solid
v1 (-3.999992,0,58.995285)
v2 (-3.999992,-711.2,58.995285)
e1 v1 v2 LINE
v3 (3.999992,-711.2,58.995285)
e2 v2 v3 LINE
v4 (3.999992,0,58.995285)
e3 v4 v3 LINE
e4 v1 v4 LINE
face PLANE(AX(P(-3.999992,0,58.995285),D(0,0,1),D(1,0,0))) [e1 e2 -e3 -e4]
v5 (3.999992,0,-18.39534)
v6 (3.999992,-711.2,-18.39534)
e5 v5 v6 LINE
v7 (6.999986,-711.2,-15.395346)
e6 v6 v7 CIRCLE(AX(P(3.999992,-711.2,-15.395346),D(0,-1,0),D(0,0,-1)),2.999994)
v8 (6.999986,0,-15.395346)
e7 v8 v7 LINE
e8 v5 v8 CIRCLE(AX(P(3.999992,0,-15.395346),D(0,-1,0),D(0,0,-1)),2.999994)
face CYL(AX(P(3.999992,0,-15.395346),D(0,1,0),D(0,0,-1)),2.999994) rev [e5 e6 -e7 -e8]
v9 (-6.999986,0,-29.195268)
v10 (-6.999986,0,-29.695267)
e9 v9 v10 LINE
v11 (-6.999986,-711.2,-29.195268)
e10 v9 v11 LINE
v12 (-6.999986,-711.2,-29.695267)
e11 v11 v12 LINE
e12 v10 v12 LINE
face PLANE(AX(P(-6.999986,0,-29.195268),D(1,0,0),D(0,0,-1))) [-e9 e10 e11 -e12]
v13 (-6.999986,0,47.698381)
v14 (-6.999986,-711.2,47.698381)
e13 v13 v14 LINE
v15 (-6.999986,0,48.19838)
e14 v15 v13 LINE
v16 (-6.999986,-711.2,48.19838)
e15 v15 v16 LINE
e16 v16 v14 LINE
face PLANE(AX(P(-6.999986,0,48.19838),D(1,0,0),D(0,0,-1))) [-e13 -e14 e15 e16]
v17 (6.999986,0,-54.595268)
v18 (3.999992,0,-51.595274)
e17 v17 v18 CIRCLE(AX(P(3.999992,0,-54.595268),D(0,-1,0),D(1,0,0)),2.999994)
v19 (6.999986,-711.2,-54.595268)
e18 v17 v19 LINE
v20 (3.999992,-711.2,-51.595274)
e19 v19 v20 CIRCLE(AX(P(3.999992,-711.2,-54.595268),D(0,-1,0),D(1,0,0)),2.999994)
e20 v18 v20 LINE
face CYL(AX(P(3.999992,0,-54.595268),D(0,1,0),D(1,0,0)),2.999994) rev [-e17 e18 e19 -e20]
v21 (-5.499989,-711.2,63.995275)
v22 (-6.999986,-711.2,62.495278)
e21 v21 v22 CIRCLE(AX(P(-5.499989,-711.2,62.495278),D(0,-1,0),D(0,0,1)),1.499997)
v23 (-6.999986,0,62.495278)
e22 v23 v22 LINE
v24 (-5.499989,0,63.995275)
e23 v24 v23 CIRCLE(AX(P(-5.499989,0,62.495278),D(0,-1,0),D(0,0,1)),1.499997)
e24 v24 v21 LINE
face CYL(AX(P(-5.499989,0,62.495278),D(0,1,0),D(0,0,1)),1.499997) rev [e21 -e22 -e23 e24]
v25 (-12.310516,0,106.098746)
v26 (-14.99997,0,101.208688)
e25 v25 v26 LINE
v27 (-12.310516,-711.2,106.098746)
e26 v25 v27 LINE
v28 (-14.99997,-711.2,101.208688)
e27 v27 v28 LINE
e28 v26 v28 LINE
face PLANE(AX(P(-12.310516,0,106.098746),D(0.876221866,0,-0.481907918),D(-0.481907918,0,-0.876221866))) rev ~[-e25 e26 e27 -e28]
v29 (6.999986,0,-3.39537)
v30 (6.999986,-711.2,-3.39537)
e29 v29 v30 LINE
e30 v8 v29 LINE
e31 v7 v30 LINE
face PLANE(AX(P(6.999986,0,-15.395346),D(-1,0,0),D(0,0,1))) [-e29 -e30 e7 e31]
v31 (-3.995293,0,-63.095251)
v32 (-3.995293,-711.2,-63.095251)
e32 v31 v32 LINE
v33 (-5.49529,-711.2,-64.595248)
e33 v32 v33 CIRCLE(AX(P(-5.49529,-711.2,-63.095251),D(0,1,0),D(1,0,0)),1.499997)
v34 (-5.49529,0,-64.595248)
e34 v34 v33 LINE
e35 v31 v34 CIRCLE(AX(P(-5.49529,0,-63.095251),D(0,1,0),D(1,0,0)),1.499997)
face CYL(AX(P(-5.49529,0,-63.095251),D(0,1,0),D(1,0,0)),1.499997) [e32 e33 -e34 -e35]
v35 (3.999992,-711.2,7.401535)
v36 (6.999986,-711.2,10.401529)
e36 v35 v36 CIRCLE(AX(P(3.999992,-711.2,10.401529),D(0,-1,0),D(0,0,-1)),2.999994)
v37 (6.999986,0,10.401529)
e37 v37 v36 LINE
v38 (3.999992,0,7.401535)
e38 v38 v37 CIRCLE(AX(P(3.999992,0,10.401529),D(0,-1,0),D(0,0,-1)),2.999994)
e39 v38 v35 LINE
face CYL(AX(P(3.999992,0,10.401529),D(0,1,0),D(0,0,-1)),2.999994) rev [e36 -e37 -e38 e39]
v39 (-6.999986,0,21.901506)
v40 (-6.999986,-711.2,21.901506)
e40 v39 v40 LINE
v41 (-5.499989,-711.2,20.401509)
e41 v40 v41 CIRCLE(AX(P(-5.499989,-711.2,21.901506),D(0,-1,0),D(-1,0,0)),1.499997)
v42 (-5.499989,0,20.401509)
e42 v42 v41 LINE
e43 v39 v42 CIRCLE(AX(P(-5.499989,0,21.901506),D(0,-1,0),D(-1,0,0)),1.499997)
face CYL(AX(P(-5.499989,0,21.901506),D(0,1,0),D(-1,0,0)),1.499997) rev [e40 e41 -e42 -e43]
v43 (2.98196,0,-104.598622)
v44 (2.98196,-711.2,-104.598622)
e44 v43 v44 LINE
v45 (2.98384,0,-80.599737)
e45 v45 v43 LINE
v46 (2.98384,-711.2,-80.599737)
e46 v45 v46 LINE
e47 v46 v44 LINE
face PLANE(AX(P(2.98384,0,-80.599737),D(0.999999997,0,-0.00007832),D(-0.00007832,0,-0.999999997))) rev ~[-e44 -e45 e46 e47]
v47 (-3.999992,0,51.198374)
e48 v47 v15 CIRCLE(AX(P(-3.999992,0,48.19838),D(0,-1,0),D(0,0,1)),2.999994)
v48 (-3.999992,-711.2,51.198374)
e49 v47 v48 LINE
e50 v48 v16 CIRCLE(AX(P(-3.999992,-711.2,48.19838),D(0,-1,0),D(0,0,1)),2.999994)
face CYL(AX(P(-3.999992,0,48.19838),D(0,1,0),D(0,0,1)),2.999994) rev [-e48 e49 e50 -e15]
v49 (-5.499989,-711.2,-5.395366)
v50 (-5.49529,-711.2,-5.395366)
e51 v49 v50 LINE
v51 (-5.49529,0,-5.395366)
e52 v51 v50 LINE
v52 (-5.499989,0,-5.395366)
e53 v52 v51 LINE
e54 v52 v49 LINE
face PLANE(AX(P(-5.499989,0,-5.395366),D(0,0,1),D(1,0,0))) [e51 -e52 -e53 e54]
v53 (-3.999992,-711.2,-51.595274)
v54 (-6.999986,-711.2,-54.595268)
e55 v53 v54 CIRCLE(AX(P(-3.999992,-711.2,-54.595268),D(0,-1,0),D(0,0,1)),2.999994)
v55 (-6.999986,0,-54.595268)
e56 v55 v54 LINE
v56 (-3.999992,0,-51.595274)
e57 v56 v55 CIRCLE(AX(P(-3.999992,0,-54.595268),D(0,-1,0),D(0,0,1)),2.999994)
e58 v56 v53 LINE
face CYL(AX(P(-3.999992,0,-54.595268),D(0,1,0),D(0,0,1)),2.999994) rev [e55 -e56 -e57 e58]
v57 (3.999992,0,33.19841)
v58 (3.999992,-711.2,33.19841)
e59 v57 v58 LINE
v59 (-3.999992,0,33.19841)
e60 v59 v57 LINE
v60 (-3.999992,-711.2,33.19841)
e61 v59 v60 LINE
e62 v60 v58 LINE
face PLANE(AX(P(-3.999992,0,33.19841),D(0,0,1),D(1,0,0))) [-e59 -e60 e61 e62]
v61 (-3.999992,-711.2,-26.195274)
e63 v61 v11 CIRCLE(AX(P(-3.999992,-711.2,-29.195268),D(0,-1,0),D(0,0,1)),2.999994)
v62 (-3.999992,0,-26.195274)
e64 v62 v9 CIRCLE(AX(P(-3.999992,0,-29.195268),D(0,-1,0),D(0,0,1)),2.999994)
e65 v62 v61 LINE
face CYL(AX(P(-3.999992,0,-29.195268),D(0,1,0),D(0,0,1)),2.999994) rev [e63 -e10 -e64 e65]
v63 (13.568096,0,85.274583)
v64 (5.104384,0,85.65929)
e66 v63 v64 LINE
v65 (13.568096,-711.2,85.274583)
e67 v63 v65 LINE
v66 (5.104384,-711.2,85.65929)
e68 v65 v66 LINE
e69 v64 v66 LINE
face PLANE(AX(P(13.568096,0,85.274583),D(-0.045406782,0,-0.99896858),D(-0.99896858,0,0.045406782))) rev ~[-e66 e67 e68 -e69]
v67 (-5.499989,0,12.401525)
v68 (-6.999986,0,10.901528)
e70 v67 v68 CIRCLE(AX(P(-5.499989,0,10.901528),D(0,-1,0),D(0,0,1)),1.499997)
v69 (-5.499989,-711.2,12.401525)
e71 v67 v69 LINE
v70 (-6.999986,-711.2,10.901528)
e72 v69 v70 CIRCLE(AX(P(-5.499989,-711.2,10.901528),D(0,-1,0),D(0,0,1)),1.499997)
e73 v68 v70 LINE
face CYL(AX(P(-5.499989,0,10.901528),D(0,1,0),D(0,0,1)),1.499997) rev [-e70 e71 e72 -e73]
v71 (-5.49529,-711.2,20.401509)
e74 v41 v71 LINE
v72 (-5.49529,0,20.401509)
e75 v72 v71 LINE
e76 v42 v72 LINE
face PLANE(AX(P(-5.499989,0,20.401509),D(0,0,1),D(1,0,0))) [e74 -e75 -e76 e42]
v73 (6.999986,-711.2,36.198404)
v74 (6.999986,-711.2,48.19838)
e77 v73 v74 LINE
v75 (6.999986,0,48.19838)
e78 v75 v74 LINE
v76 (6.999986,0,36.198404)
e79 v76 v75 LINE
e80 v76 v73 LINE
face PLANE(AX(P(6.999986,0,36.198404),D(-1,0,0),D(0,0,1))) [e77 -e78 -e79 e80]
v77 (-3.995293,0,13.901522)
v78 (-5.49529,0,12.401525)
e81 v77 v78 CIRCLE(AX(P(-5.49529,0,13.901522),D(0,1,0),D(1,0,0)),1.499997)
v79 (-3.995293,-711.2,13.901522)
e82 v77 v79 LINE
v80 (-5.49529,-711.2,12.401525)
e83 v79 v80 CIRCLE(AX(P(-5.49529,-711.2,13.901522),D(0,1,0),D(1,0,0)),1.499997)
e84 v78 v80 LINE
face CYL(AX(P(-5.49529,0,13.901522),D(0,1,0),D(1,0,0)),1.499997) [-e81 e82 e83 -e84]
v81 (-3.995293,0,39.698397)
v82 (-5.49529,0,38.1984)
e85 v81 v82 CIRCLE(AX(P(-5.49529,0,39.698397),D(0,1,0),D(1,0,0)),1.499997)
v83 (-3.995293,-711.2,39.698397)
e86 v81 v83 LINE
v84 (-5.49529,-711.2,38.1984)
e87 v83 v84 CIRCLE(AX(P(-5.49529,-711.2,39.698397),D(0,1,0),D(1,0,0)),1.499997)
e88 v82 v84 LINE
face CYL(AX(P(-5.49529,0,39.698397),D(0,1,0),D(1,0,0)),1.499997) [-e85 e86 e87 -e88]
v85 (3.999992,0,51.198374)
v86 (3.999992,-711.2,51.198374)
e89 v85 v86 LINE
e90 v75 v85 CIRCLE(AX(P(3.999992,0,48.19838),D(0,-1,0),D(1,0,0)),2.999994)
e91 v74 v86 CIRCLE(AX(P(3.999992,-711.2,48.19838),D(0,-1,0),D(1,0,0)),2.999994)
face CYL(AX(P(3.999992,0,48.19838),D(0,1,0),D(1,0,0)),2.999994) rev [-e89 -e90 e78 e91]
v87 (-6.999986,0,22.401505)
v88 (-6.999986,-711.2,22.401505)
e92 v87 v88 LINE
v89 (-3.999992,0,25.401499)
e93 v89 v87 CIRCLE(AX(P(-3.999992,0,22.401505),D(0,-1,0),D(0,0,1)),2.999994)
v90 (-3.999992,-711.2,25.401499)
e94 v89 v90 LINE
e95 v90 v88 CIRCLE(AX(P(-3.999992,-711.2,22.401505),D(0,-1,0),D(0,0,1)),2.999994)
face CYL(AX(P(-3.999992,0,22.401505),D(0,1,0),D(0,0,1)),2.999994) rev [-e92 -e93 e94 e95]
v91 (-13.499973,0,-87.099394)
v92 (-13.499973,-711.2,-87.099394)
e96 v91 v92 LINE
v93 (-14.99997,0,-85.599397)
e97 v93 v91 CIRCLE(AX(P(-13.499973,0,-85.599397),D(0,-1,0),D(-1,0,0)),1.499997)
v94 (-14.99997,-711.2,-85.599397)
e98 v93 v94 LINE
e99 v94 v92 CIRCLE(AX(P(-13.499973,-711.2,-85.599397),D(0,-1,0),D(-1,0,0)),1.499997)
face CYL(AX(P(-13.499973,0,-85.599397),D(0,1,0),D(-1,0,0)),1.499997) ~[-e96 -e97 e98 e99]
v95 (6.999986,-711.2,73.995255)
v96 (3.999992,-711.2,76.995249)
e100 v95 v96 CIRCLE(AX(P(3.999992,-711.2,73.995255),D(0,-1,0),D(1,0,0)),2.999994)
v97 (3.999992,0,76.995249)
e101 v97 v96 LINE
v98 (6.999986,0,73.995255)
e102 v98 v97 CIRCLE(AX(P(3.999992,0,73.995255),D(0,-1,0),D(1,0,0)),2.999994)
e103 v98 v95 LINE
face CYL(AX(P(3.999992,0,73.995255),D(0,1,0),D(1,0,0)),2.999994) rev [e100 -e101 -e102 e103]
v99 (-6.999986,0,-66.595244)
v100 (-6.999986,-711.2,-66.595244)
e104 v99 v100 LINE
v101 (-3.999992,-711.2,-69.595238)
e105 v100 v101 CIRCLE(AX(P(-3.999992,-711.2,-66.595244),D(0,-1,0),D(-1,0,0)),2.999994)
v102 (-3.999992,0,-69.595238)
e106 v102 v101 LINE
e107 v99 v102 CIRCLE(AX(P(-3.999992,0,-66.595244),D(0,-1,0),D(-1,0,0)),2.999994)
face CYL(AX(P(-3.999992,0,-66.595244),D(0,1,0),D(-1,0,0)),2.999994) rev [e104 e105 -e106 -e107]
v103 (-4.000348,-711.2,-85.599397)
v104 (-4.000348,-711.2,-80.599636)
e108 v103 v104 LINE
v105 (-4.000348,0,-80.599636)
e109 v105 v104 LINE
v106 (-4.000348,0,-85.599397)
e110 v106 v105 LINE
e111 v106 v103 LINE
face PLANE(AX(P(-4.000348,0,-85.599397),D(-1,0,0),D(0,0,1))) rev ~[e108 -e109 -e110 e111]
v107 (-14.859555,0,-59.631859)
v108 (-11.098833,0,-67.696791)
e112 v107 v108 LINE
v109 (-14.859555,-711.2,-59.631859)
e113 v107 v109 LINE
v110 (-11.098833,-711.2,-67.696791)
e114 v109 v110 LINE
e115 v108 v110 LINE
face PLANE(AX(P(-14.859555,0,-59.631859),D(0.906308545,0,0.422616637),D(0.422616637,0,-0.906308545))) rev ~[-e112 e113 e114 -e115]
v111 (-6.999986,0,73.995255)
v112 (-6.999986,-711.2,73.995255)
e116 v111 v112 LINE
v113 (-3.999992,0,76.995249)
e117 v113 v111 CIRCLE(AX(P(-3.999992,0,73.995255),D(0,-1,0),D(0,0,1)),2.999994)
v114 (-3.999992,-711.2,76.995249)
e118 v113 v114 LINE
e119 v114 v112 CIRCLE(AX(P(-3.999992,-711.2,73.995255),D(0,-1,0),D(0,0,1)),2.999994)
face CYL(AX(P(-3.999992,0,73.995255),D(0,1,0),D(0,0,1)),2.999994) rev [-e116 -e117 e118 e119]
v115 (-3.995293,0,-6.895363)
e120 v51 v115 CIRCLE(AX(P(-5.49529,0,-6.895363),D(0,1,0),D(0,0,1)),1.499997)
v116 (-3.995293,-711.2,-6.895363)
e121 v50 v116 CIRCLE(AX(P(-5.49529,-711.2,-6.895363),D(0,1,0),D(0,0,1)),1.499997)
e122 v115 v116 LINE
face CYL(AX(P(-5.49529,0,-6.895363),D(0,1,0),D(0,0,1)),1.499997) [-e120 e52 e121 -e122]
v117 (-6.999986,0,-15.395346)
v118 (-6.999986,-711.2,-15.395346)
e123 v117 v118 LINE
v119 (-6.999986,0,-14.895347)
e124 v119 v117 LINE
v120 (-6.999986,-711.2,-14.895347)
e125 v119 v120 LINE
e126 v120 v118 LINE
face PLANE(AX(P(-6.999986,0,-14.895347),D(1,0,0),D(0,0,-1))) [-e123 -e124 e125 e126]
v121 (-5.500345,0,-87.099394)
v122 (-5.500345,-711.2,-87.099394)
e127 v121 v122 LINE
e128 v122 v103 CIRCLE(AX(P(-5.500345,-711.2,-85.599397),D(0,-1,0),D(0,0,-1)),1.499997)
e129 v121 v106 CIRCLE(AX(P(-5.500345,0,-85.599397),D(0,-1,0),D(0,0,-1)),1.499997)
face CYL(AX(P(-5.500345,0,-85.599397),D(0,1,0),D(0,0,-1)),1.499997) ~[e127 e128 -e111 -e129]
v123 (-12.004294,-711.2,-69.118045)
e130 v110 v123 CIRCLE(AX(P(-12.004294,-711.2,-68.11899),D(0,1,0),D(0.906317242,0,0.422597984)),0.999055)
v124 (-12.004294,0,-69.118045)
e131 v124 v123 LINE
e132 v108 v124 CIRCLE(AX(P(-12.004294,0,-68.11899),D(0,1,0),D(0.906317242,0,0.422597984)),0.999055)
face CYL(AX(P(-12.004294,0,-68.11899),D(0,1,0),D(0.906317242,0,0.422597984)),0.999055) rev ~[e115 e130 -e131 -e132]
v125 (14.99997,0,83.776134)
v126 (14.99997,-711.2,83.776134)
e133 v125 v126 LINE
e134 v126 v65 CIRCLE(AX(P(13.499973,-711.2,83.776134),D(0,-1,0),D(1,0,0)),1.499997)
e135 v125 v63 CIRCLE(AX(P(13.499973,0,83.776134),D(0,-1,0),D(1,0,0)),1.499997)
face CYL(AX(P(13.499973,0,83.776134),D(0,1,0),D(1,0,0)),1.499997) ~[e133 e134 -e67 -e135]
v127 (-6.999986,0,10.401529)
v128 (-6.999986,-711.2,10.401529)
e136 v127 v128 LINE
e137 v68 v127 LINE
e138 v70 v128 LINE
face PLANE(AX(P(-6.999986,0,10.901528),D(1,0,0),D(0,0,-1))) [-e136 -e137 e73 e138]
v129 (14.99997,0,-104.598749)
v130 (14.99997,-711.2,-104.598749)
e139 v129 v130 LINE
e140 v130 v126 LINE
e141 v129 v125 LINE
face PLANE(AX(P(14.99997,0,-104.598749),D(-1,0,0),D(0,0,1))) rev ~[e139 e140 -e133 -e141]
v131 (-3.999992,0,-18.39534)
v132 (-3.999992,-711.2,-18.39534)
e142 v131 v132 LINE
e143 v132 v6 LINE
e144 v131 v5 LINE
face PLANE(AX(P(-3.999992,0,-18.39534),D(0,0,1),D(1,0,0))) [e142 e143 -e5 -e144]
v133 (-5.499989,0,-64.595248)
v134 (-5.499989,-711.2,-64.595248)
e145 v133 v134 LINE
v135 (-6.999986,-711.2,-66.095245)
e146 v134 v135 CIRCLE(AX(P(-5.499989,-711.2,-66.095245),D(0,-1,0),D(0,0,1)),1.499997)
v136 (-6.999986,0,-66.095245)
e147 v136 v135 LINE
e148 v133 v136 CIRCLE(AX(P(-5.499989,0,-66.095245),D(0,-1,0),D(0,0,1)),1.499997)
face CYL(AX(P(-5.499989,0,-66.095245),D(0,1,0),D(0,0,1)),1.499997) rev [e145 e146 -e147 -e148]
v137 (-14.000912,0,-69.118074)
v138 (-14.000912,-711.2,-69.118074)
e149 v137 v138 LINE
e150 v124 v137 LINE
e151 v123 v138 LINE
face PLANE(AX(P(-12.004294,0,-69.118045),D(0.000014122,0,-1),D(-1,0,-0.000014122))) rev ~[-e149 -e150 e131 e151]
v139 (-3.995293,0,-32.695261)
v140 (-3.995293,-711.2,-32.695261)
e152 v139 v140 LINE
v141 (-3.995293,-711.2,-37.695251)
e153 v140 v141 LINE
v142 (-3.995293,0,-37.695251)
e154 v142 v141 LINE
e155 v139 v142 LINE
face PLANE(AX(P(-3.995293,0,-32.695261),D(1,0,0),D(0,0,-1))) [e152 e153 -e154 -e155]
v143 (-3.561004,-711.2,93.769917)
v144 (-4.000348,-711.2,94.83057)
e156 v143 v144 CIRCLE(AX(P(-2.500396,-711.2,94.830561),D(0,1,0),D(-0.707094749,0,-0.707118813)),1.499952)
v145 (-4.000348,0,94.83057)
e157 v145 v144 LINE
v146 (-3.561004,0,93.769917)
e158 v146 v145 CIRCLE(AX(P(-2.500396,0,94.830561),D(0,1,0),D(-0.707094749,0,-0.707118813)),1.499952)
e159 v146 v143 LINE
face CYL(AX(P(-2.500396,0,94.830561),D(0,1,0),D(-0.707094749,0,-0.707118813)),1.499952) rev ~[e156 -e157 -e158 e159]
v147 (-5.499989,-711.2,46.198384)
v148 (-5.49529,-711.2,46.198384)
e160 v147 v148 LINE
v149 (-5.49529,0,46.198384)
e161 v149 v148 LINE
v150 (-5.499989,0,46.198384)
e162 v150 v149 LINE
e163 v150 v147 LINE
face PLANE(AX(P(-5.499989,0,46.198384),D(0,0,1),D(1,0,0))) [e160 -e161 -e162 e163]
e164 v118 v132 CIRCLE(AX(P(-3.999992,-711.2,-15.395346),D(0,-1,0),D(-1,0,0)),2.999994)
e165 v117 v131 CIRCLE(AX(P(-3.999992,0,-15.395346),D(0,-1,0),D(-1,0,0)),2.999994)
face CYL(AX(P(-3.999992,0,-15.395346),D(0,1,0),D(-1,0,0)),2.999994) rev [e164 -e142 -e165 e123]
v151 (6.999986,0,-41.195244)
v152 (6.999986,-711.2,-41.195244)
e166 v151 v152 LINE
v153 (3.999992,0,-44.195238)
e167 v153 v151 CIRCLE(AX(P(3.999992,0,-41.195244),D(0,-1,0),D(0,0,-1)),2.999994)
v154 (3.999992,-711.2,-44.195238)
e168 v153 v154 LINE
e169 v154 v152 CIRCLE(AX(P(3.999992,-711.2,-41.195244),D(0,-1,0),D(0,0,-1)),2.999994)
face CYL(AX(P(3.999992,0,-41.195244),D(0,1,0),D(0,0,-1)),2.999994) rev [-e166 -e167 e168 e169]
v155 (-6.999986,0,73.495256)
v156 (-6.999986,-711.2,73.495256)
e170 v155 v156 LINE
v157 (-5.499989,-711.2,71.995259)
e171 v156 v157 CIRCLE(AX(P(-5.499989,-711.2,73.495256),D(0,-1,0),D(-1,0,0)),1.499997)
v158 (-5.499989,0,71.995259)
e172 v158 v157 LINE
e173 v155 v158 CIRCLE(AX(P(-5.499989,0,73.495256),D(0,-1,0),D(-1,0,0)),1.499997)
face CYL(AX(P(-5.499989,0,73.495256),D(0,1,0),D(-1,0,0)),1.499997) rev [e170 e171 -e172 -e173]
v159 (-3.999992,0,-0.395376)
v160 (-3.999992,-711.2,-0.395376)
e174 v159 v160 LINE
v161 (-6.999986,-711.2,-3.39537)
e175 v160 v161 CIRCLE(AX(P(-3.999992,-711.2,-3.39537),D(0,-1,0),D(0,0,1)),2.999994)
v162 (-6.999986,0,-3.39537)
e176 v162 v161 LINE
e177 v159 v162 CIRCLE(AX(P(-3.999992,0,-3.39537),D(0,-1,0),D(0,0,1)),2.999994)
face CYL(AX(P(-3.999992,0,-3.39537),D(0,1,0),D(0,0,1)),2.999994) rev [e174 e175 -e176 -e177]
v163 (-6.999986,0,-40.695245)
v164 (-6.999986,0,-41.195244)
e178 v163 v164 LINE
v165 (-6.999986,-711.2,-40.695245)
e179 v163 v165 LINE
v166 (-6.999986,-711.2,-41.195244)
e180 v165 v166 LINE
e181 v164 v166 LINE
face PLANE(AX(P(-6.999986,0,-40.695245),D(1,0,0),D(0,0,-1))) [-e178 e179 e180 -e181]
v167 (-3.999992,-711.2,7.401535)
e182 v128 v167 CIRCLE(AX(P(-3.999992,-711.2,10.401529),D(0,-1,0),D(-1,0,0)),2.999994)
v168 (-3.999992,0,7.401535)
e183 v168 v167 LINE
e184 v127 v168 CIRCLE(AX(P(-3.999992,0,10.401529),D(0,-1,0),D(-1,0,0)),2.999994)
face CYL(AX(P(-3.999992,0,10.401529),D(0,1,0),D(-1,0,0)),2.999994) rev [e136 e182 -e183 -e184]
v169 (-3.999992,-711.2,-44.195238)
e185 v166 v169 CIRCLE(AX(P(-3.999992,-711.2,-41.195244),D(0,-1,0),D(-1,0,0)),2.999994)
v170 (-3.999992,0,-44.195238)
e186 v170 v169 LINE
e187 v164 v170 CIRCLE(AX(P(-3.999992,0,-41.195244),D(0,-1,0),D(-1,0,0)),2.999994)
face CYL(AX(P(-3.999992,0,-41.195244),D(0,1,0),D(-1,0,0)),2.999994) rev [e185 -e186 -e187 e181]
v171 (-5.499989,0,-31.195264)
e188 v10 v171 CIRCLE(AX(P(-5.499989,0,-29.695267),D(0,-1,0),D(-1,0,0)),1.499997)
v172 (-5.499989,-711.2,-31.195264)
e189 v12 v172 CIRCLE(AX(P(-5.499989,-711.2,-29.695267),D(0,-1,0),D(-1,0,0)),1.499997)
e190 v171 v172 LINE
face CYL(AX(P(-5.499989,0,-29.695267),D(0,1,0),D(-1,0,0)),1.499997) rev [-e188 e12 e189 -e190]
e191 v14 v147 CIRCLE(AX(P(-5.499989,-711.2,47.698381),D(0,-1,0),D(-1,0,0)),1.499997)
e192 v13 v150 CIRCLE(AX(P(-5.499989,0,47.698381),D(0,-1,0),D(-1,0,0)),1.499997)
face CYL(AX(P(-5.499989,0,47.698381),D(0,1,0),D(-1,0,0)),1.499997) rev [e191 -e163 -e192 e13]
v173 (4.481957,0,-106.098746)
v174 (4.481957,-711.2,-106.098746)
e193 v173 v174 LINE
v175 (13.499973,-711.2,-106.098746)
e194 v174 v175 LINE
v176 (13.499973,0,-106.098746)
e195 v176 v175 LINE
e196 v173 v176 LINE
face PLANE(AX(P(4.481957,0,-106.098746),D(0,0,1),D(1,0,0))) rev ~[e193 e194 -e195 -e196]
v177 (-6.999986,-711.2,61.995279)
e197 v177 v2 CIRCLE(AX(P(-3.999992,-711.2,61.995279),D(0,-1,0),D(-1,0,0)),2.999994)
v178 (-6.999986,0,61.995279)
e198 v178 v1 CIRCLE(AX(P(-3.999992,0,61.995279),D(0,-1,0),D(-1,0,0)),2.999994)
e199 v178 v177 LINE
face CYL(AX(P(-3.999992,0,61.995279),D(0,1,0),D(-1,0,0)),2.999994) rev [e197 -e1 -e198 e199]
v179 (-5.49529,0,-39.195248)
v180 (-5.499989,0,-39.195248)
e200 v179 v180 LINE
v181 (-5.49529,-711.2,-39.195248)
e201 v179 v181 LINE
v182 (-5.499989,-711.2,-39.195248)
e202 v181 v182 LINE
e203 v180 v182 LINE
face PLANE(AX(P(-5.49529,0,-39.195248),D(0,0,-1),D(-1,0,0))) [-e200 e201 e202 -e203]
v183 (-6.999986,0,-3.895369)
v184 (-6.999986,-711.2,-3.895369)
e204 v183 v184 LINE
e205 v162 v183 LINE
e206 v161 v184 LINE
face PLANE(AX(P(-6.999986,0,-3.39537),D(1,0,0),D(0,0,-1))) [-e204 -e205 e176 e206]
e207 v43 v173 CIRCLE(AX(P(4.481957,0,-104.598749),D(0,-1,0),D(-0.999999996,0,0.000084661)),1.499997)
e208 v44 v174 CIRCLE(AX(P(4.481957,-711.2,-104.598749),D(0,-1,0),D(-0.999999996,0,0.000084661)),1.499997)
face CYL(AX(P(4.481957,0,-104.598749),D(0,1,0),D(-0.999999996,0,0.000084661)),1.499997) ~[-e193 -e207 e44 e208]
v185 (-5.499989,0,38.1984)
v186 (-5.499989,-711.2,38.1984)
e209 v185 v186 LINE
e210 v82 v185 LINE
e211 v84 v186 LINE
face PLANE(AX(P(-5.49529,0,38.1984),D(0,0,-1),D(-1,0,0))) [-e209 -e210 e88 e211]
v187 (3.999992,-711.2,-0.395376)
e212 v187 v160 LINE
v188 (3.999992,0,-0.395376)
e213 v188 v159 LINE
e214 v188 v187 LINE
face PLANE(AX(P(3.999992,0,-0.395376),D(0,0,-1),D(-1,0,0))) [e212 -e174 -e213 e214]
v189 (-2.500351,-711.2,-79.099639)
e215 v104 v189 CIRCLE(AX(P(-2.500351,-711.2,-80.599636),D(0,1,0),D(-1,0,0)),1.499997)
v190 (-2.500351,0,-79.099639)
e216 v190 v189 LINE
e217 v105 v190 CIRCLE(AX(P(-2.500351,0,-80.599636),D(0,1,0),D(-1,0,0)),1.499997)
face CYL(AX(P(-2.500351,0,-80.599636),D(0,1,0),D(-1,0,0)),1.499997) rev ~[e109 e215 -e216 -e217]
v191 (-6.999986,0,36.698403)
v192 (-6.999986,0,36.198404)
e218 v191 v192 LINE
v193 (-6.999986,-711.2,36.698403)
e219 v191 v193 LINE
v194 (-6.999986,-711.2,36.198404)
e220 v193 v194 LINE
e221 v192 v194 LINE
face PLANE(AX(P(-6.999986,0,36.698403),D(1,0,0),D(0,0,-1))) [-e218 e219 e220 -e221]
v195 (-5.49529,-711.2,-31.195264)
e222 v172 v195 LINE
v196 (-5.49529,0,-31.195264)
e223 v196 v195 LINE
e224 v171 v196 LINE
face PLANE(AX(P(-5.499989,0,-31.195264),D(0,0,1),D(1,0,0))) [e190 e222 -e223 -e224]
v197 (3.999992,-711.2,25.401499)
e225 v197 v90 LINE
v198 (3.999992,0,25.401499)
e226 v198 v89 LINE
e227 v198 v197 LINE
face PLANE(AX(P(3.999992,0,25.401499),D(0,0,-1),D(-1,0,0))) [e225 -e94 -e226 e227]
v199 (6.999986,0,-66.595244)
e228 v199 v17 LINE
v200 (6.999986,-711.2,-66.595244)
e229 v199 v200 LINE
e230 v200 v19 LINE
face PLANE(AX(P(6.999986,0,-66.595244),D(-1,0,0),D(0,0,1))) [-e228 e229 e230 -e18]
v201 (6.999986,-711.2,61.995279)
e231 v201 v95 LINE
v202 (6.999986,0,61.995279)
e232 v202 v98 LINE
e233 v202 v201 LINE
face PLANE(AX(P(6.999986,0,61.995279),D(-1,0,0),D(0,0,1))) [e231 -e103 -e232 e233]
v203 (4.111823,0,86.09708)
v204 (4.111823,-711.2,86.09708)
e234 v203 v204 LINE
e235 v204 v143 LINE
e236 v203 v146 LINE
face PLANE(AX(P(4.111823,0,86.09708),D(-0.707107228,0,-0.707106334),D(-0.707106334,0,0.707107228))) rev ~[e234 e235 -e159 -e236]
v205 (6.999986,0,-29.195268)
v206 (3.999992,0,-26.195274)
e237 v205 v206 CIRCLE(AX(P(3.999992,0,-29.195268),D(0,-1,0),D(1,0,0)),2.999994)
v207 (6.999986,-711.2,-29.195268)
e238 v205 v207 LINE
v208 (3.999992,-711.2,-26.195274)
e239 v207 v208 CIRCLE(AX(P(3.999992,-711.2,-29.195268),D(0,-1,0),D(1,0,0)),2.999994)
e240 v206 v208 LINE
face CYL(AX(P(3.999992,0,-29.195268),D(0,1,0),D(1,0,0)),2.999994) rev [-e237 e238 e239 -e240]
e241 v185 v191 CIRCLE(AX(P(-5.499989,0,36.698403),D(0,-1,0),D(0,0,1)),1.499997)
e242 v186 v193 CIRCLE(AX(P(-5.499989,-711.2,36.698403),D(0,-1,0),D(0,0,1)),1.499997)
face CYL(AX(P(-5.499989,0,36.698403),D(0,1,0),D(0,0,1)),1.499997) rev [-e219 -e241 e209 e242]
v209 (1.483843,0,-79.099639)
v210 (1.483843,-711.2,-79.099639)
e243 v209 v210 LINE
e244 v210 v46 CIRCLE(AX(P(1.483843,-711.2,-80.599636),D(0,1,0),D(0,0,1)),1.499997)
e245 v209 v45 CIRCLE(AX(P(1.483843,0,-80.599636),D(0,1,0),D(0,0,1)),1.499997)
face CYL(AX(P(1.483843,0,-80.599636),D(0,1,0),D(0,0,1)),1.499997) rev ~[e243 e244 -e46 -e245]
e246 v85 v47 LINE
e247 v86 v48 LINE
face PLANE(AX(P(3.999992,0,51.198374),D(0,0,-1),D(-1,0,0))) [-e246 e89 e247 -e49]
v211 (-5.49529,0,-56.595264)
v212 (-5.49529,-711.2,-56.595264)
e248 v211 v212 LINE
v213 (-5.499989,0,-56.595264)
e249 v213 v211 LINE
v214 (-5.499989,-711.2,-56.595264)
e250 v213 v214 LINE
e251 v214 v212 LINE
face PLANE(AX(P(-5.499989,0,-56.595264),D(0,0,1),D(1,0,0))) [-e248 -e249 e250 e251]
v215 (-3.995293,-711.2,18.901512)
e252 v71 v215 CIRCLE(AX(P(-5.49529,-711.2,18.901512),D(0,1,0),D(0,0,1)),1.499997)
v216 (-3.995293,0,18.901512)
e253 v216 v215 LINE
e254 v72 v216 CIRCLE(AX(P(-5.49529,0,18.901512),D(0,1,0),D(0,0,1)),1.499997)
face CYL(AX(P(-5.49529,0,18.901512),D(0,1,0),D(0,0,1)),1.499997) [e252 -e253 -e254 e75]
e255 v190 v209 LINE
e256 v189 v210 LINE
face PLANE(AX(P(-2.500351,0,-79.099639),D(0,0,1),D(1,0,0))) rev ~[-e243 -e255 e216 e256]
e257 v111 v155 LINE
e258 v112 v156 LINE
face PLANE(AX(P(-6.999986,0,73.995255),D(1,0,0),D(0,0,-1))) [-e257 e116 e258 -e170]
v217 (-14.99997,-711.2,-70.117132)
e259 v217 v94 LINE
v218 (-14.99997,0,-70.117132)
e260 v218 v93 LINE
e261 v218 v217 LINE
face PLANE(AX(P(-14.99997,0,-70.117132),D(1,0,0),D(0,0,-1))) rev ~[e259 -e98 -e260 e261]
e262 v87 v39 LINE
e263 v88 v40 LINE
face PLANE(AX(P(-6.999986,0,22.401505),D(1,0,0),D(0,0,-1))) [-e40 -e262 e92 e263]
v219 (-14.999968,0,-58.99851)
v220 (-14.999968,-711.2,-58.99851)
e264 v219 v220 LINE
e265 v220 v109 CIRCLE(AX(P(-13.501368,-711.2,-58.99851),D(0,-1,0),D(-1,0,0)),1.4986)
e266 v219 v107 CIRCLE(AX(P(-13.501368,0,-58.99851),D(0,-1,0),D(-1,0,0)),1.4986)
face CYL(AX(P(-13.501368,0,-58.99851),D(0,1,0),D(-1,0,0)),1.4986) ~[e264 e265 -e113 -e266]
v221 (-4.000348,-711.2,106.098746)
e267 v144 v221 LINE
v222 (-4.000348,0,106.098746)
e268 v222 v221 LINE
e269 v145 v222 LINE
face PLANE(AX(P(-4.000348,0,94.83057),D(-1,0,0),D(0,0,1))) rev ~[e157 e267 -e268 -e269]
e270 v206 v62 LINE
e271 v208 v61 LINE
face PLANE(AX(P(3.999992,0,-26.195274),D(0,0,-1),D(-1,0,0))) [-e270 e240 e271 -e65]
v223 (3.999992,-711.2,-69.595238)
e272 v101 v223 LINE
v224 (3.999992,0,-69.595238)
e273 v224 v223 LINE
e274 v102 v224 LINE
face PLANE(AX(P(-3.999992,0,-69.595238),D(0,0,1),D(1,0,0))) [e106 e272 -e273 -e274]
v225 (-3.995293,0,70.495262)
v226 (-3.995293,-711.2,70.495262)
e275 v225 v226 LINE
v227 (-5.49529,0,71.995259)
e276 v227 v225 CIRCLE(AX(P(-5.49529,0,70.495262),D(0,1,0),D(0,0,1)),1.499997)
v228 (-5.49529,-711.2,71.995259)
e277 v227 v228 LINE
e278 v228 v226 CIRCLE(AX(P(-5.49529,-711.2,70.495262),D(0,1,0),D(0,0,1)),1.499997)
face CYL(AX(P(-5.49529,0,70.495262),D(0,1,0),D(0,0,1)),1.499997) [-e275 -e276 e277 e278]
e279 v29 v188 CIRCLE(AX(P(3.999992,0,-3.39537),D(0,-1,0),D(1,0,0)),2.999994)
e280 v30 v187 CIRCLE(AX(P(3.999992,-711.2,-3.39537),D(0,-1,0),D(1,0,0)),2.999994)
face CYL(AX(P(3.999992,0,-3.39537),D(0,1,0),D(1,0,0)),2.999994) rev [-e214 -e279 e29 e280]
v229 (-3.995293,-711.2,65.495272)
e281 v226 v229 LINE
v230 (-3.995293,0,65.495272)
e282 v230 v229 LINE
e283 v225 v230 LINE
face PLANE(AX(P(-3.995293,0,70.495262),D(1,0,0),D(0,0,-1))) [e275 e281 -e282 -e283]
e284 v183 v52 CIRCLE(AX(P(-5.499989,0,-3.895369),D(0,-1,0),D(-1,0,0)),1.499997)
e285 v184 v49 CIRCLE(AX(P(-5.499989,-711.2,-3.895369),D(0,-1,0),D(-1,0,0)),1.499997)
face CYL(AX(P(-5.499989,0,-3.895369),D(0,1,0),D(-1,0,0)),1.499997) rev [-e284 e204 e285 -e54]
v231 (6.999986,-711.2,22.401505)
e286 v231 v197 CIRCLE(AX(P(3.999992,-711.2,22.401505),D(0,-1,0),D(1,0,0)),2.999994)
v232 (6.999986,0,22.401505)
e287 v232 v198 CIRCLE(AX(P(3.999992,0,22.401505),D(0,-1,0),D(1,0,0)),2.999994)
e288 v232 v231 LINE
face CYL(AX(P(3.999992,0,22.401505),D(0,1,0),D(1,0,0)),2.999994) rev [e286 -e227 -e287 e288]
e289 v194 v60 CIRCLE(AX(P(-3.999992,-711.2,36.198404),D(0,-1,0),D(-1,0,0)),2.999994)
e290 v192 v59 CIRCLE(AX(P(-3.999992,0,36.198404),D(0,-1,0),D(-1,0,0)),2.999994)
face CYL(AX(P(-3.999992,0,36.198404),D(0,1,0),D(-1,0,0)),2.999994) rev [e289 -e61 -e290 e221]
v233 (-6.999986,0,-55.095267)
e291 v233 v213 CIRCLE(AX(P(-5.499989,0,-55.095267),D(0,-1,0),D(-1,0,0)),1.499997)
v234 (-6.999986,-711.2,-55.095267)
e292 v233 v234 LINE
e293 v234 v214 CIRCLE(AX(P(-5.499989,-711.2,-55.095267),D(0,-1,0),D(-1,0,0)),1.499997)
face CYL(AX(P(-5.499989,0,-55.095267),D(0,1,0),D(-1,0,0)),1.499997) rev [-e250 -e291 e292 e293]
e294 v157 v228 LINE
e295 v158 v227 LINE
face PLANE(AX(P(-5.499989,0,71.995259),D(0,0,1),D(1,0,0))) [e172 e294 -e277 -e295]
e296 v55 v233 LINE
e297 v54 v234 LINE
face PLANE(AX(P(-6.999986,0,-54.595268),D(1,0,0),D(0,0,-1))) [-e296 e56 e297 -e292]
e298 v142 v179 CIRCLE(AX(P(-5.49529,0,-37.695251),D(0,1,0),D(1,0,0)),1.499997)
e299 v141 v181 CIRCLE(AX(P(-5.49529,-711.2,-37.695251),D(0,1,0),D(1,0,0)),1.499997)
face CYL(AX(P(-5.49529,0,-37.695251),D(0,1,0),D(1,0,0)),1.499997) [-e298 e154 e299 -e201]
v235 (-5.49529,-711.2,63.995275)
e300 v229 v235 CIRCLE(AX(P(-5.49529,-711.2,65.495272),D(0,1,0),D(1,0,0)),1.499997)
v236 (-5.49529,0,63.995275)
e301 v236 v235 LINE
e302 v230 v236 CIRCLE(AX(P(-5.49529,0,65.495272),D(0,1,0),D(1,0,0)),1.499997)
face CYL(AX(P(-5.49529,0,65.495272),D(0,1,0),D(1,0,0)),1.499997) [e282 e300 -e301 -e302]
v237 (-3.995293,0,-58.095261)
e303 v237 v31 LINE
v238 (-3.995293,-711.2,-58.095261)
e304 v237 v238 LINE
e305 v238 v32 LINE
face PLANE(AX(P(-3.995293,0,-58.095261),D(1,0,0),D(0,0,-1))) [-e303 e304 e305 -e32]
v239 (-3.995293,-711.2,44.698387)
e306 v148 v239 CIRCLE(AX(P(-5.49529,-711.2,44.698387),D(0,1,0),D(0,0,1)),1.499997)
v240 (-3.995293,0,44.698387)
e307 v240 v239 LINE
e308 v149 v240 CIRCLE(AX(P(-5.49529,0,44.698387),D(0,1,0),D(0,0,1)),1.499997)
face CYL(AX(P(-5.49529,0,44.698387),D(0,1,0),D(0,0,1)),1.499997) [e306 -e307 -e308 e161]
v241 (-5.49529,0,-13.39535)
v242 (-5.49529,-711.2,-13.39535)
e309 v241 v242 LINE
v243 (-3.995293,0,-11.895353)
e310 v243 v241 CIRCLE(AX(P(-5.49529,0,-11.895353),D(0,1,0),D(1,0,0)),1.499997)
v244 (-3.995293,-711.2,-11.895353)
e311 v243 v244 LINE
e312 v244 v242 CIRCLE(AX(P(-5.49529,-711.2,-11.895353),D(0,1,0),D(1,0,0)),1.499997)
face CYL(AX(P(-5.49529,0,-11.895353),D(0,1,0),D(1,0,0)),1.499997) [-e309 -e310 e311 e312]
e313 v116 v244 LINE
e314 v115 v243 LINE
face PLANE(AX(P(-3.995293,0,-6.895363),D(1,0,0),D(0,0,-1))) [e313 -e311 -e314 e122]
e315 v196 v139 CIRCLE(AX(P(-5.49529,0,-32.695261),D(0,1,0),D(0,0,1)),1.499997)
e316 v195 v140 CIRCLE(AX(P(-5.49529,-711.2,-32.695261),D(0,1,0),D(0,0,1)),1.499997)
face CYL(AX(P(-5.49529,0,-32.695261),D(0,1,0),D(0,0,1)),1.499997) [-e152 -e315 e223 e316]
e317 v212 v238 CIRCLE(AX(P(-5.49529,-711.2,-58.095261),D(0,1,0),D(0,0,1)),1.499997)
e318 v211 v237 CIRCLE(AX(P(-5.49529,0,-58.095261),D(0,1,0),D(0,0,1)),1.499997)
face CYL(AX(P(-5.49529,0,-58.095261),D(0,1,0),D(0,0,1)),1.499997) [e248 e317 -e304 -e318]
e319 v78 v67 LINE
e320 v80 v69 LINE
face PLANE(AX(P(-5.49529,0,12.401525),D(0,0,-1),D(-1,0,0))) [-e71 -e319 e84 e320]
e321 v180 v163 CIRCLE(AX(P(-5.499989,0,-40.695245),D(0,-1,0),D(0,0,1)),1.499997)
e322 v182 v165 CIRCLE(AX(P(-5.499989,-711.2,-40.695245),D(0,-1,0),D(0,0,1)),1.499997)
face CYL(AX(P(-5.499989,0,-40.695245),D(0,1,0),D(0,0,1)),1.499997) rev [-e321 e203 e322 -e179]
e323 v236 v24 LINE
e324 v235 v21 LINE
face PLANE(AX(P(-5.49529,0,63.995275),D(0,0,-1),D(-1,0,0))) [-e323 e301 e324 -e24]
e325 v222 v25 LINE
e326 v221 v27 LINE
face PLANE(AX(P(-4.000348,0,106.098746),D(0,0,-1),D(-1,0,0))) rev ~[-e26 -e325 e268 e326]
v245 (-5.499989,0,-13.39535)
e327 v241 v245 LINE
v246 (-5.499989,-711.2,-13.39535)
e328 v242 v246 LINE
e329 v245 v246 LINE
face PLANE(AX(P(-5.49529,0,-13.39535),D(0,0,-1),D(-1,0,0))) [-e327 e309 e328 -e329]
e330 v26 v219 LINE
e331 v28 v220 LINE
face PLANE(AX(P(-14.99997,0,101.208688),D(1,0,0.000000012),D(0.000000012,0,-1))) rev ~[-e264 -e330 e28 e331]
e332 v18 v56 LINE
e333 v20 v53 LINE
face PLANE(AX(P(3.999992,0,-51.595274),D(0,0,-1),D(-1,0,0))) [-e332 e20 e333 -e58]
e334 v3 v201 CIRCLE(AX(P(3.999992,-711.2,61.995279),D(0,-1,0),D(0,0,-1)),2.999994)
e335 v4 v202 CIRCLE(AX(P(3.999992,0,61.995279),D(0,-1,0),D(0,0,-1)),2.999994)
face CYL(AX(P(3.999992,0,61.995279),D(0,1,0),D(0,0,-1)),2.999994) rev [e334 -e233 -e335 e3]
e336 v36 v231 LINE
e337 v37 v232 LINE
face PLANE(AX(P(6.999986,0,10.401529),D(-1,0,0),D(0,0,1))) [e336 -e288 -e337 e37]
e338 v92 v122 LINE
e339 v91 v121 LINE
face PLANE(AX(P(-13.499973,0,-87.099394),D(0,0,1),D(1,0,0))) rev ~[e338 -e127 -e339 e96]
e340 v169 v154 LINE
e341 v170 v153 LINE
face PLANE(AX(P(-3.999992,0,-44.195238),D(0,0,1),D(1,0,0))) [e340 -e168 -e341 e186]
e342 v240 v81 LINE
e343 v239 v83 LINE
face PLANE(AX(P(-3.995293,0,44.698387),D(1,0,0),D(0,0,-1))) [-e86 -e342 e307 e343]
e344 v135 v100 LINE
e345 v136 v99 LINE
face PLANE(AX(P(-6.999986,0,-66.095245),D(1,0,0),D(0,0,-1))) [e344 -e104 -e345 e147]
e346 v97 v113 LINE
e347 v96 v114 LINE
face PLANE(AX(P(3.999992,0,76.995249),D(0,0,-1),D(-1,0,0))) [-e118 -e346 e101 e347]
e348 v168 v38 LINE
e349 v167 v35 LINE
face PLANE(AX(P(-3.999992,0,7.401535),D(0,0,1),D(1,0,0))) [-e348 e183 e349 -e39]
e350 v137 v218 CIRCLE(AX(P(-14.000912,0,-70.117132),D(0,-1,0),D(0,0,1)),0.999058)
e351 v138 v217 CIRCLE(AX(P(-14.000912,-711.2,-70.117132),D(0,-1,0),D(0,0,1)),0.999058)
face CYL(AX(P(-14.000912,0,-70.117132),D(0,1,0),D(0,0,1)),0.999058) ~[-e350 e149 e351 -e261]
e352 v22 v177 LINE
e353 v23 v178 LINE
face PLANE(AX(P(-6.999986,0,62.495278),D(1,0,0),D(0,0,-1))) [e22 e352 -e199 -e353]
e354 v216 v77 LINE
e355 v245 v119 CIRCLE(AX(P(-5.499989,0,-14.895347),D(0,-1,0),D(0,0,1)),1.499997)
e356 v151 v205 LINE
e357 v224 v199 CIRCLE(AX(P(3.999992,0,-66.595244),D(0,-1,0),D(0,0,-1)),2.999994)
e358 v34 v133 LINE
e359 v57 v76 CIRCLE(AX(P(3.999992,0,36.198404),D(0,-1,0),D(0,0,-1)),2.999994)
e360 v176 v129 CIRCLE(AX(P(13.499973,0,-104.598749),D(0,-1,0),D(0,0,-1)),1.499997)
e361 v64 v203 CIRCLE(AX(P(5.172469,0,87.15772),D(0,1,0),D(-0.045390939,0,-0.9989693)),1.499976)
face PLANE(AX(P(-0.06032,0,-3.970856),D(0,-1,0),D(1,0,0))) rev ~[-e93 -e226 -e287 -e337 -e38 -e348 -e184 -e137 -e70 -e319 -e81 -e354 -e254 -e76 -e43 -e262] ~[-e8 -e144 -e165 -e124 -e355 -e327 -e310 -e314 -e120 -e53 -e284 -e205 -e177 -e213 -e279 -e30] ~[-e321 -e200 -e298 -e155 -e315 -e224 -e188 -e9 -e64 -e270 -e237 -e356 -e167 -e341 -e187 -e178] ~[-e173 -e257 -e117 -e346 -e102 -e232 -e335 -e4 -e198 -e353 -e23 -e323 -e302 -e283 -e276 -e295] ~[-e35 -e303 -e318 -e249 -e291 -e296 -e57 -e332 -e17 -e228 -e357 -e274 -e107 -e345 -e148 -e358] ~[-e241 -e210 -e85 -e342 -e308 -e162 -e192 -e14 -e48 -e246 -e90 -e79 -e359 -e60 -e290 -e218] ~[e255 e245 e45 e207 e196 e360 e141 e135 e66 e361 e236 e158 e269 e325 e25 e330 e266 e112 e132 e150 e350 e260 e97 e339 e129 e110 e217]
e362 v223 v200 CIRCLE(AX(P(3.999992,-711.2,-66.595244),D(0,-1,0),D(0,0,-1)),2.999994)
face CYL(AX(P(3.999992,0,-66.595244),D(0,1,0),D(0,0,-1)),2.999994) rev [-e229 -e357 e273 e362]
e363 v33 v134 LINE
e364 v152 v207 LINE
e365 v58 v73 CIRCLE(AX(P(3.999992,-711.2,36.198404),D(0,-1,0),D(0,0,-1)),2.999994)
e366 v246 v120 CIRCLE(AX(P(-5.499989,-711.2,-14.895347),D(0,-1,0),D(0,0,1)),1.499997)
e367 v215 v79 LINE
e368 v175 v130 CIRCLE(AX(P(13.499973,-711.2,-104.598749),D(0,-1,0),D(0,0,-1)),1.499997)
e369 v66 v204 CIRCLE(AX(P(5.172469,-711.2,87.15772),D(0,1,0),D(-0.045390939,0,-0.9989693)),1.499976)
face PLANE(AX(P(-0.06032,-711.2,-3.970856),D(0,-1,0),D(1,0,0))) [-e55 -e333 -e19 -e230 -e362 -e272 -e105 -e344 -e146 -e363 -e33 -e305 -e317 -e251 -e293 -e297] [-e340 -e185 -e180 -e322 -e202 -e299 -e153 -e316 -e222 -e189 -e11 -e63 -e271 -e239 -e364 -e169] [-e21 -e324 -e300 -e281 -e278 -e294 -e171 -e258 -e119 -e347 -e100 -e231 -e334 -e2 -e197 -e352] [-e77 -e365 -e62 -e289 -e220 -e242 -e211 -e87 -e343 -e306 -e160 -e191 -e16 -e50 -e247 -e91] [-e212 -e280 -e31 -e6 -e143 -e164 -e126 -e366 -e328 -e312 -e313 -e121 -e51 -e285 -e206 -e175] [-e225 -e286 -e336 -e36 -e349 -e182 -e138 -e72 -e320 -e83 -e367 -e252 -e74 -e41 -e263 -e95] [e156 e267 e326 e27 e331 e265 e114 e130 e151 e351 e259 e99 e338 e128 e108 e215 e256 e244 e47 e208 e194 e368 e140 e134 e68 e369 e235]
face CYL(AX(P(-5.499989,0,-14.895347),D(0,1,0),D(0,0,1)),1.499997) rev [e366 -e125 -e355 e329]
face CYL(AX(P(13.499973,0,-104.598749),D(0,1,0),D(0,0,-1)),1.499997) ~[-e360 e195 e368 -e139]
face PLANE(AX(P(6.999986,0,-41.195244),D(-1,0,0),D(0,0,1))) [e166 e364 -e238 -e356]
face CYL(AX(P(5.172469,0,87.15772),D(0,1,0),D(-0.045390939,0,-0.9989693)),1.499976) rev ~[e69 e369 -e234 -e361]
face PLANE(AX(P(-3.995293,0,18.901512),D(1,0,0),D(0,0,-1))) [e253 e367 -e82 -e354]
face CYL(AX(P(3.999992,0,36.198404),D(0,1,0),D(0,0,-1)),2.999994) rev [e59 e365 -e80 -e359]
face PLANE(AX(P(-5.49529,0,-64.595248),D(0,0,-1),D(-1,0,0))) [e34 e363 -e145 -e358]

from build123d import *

# Parameters (mm, degrees)
F1_DEPTH = 711.2
F3_DEPTH = 711.2


# Not quite as in the source:
# - ends of sketch curves that miss each other by under 0.0002 mm in the source are joined


with BuildPart() as f1:
    # F0 (on Front) → F1 (new body)
    with BuildSketch(Plane.XZ):
        with BuildLine():
            ThreePointArc((-14.9999680608, -58.9985104), (-14.96444377, -59.322873513), (-14.8595551032, -59.6318585804))
            Line((-14.8595551032, -59.6318585804), (-11.0988328608, -67.6967912))
            ThreePointArc((-11.0988328608, -67.6967912), (-11.1617050028, -68.655791158), (-12.004294, -69.1180454046))
            Line((-12.004294, -69.1180454046), (-14.0009118, -69.1180736))
            ThreePointArc((-14.0009118, -69.1180736), (-14.707352628, -69.410690972), (-14.99997, -70.1171318))
            Line((-14.99997, -70.1171318), (-14.99997, -85.599397))
            ThreePointArc((-14.99997, -85.599397), (-14.5606310505, -86.6600550505), (-13.499973, -87.099394))
            Line((-13.499973, -87.099394), (-5.5003446, -87.099394))
            ThreePointArc((-5.5003446, -87.099394), (-4.4396865495, -86.6600550505), (-4.0003476, -85.599397))
            Line((-4.0003476, -85.599397), (-4.0003476, -80.5996356))
            ThreePointArc((-4.0003476, -80.5996356), (-3.5610086505, -79.5389775495), (-2.5003506, -79.0996386))
            Line((-2.5003506, -79.0996386), (1.4838426, -79.0996386))
            ThreePointArc((1.4838426, -79.0996386), (2.5445365709, -79.5390134712), (2.9838395966, -80.5997372))
            Line((2.9838395966, -80.5997372), (2.98196, -104.5986224))
            ThreePointArc((2.98196, -104.5986224), (3.4212540492, -105.6593625482), (4.481957, -106.0987464))
            Line((4.481957, -106.0987464), (13.499973, -106.0987464))
            ThreePointArc((13.499973, -106.0987464), (14.5606310505, -105.6594074505), (14.99997, -104.5987494))
            Line((14.99997, -104.5987494), (14.99997, 83.7761342))
            ThreePointArc((14.99997, 83.7761342), (14.5844487053, 84.8124273268), (13.5680958768, 85.2745834897))
            Line((13.5680958768, 85.2745834897), (5.104384, 85.6592902))
            ThreePointArc((5.104384, 85.6592902), (4.5671403109, 85.7853117853), (4.1118233495, 86.0970797495))
            Line((4.1118233495, 86.0970797495), (-3.5610038, 93.7699166))
            ThreePointArc((-3.5610038, 93.7699166), (-3.8861671271, 94.2565457995), (-4.0003476, 94.8305698))
            Line((-4.0003476, 94.8305698), (-4.0003476, 106.0987464))
            Line((-4.0003476, 106.0987464), (-12.3105164, 106.0987464))
            Line((-12.3105164, 106.0987464), (-14.99997, 101.2086876))
            Line((-14.99997, 101.2086876), (-14.9999680608, -58.9985104))
        make_face()
    extrude(amount=F1_DEPTH)

    # F2 (on Front) → F3 (cut)
    with BuildSketch(Plane.XZ):
        with BuildLine():
            ThreePointArc((-5.49529, -31.195264), (-4.4346319495, -31.6346029495), (-3.995293, -32.695261))
            Line((-3.995293, -32.695261), (-3.995293, -37.695251))
            ThreePointArc((-3.995293, -37.695251), (-4.4346319495, -38.7559090505), (-5.49529, -39.195248))
            Line((-5.49529, -39.195248), (-5.499989, -39.195248))
            ThreePointArc((-5.499989, -39.195248), (-6.5606470505, -39.6345869495), (-6.999986, -40.695245))
            Line((-6.999986, -40.695245), (-6.999986, -41.195244))
            ThreePointArc((-6.999986, -41.195244), (-6.1213081009, -43.3165601009), (-3.999992, -44.195238))
            Line((-3.999992, -44.195238), (3.999992, -44.195238))
            ThreePointArc((3.999992, -44.195238), (6.1213081009, -43.3165601009), (6.999986, -41.195244))
            Line((6.999986, -41.195244), (6.999986, -29.195268))
            ThreePointArc((6.999986, -29.195268), (6.1213081009, -27.0739518991), (3.999992, -26.195274))
            Line((3.999992, -26.195274), (-3.999992, -26.195274))
            ThreePointArc((-3.999992, -26.195274), (-6.1213081009, -27.0739518991), (-6.999986, -29.195268))
            Line((-6.999986, -29.195268), (-6.999986, -29.695267))
            ThreePointArc((-6.999986, -29.695267), (-6.5606470505, -30.7559250505), (-5.499989, -31.195264))
            Line((-5.499989, -31.195264), (-5.49529, -31.195264))
        make_face()
        with BuildLine():
            ThreePointArc((-5.49529, -56.595264), (-4.4346319495, -57.0346029495), (-3.995293, -58.095261))
            Line((-3.995293, -58.095261), (-3.995293, -63.095251))
            ThreePointArc((-3.995293, -63.095251), (-4.4346319495, -64.1559090505), (-5.49529, -64.595248))
            Line((-5.49529, -64.595248), (-5.499989, -64.595248))
            ThreePointArc((-5.499989, -64.595248), (-6.5606470505, -65.0345869495), (-6.999986, -66.095245))
            Line((-6.999986, -66.095245), (-6.999986, -66.595244))
            ThreePointArc((-6.999986, -66.595244), (-6.1213081009, -68.7165601009), (-3.999992, -69.595238))
            Line((-3.999992, -69.595238), (0, -69.595238))
            Line((0, -69.595238), (3.999992, -69.595238))
            ThreePointArc((3.999992, -69.595238), (6.1213081009, -68.7165601009), (6.999986, -66.595244))
            Line((6.999986, -66.595244), (6.999986, -54.595268))
            ThreePointArc((6.999986, -54.595268), (6.1213081009, -52.4739518991), (3.999992, -51.595274))
            Line((3.999992, -51.595274), (-3.999992, -51.595274))
            ThreePointArc((-3.999992, -51.595274), (-6.1213081009, -52.4739518991), (-6.999986, -54.595268))
            Line((-6.999986, -54.595268), (-6.999986, -55.095267))
            ThreePointArc((-6.999986, -55.095267), (-6.5606470505, -56.1559250505), (-5.499989, -56.595264))
            Line((-5.499989, -56.595264), (-5.49529, -56.595264))
        make_face()
        with BuildLine():
            ThreePointArc((-5.49529, -5.3953664), (-4.4346319495, -5.8347053495), (-3.995293, -6.8953634))
            Line((-3.995293, -6.8953634), (-3.995293, -11.8953534))
            ThreePointArc((-3.995293, -11.8953534), (-4.4346319495, -12.9560114505), (-5.49529, -13.3953504))
            Line((-5.49529, -13.3953504), (-5.499989, -13.3953504))
            ThreePointArc((-5.499989, -13.3953504), (-6.5606470505, -13.8346893495), (-6.999986, -14.8953474))
            Line((-6.999986, -14.8953474), (-6.999986, -15.3953464))
            ThreePointArc((-6.999986, -15.3953464), (-6.1213081009, -17.5166625009), (-3.999992, -18.3953404))
            Line((-3.999992, -18.3953404), (3.999992, -18.3953404))
            ThreePointArc((3.999992, -18.3953404), (6.1213081009, -17.5166625009), (6.999986, -15.3953464))
            Line((6.999986, -15.3953464), (6.999986, -3.3953704))
            ThreePointArc((6.999986, -3.3953704), (6.1213081009, -1.2740542991), (3.999992, -0.3953764))
            Line((3.999992, -0.3953764), (-3.999992, -0.3953764))
            ThreePointArc((-3.999992, -0.3953764), (-6.1213081009, -1.2740542991), (-6.999986, -3.3953704))
            Line((-6.999986, -3.3953704), (-6.999986, -3.8953694))
            ThreePointArc((-6.999986, -3.8953694), (-6.5606470505, -4.9560274505), (-5.499989, -5.3953664))
            Line((-5.499989, -5.3953664), (-5.49529, -5.3953664))
        make_face()
        with BuildLine():
            Line((-5.499989, 20.4015086), (-5.49529, 20.4015086))
            ThreePointArc((-5.49529, 20.4015086), (-4.4346319495, 19.9621696505), (-3.995293, 18.9015116))
            Line((-3.995293, 18.9015116), (-3.995293, 13.9015216))
            ThreePointArc((-3.995293, 13.9015216), (-4.4346319495, 12.8408635495), (-5.49529, 12.4015246))
            Line((-5.49529, 12.4015246), (-5.499989, 12.4015246))
            ThreePointArc((-5.499989, 12.4015246), (-6.5606470505, 11.9621856505), (-6.999986, 10.9015276))
            Line((-6.999986, 10.9015276), (-6.999986, 10.4015286))
            ThreePointArc((-6.999986, 10.4015286), (-6.1213081009, 8.2802124991), (-3.999992, 7.4015346))
            Line((-3.999992, 7.4015346), (3.999992, 7.4015346))
            ThreePointArc((3.999992, 7.4015346), (6.1213081009, 8.2802124991), (6.999986, 10.4015286))
            Line((6.999986, 10.4015286), (6.999986, 22.4015046))
            ThreePointArc((6.999986, 22.4015046), (6.1213081009, 24.5228207009), (3.999992, 25.4014986))
            Line((3.999992, 25.4014986), (-3.999992, 25.4014986))
            ThreePointArc((-3.999992, 25.4014986), (-6.1213081009, 24.5228207009), (-6.999986, 22.4015046))
            Line((-6.999986, 22.4015046), (-6.999986, 21.9015056))
            ThreePointArc((-6.999986, 21.9015056), (-6.5606470505, 20.8408475495), (-5.499989, 20.4015086))
        make_face()
        with BuildLine():
            Line((-5.499989, 46.1983836), (-5.49529, 46.1983836))
            ThreePointArc((-5.49529, 46.1983836), (-4.4346319495, 45.7590446505), (-3.995293, 44.6983866))
            Line((-3.995293, 44.6983866), (-3.995293, 39.6983966))
            ThreePointArc((-3.995293, 39.6983966), (-4.4346319495, 38.6377385495), (-5.49529, 38.1983996))
            Line((-5.49529, 38.1983996), (-5.499989, 38.1983996))
            ThreePointArc((-5.499989, 38.1983996), (-6.5606470505, 37.7590606505), (-6.999986, 36.6984026))
            Line((-6.999986, 36.6984026), (-6.999986, 36.1984036))
            ThreePointArc((-6.999986, 36.1984036), (-6.1213081009, 34.0770874991), (-3.999992, 33.1984096))
            Line((-3.999992, 33.1984096), (3.999992, 33.1984096))
            ThreePointArc((3.999992, 33.1984096), (6.1213081009, 34.0770874991), (6.999986, 36.1984036))
            Line((6.999986, 36.1984036), (6.999986, 48.1983796))
            ThreePointArc((6.999986, 48.1983796), (6.1213081009, 50.3196957009), (3.999992, 51.1983736))
            Line((3.999992, 51.1983736), (-3.999992, 51.1983736))
            ThreePointArc((-3.999992, 51.1983736), (-6.1213081009, 50.3196957009), (-6.999986, 48.1983796))
            Line((-6.999986, 48.1983796), (-6.999986, 47.6983806))
            ThreePointArc((-6.999986, 47.6983806), (-6.5606470505, 46.6377225495), (-5.499989, 46.1983836))
        make_face()
        with BuildLine():
            Line((-5.499989, 71.9952586), (-5.49529, 71.9952586))
            ThreePointArc((-5.49529, 71.9952586), (-4.4346319495, 71.5559196505), (-3.995293, 70.4952616))
            Line((-3.995293, 70.4952616), (-3.995293, 65.4952716))
            ThreePointArc((-3.995293, 65.4952716), (-4.4346319495, 64.4346135495), (-5.49529, 63.9952746))
            Line((-5.49529, 63.9952746), (-5.499989, 63.9952746))
            ThreePointArc((-5.499989, 63.9952746), (-6.5606470505, 63.5559356505), (-6.999986, 62.4952776))
            Line((-6.999986, 62.4952776), (-6.999986, 61.9952786))
            ThreePointArc((-6.999986, 61.9952786), (-6.1213081009, 59.8739624991), (-3.999992, 58.9952846))
            Line((-3.999992, 58.9952846), (3.999992, 58.9952846))
            ThreePointArc((3.999992, 58.9952846), (6.1213081009, 59.8739624991), (6.999986, 61.9952786))
            Line((6.999986, 61.9952786), (6.999986, 73.9952546))
            ThreePointArc((6.999986, 73.9952546), (6.1213081009, 76.1165707009), (3.999992, 76.9952486))
            Line((3.999992, 76.9952486), (-3.999992, 76.9952486))
            ThreePointArc((-3.999992, 76.9952486), (-6.1213081009, 76.1165707009), (-6.999986, 73.9952546))
            Line((-6.999986, 73.9952546), (-6.999986, 73.4952556))
            ThreePointArc((-6.999986, 73.4952556), (-6.5606470505, 72.4345975495), (-5.499989, 71.9952586))
        make_face()
    extrude(amount=F3_DEPTH, mode=Mode.SUBTRACT)


solid = f1.part
